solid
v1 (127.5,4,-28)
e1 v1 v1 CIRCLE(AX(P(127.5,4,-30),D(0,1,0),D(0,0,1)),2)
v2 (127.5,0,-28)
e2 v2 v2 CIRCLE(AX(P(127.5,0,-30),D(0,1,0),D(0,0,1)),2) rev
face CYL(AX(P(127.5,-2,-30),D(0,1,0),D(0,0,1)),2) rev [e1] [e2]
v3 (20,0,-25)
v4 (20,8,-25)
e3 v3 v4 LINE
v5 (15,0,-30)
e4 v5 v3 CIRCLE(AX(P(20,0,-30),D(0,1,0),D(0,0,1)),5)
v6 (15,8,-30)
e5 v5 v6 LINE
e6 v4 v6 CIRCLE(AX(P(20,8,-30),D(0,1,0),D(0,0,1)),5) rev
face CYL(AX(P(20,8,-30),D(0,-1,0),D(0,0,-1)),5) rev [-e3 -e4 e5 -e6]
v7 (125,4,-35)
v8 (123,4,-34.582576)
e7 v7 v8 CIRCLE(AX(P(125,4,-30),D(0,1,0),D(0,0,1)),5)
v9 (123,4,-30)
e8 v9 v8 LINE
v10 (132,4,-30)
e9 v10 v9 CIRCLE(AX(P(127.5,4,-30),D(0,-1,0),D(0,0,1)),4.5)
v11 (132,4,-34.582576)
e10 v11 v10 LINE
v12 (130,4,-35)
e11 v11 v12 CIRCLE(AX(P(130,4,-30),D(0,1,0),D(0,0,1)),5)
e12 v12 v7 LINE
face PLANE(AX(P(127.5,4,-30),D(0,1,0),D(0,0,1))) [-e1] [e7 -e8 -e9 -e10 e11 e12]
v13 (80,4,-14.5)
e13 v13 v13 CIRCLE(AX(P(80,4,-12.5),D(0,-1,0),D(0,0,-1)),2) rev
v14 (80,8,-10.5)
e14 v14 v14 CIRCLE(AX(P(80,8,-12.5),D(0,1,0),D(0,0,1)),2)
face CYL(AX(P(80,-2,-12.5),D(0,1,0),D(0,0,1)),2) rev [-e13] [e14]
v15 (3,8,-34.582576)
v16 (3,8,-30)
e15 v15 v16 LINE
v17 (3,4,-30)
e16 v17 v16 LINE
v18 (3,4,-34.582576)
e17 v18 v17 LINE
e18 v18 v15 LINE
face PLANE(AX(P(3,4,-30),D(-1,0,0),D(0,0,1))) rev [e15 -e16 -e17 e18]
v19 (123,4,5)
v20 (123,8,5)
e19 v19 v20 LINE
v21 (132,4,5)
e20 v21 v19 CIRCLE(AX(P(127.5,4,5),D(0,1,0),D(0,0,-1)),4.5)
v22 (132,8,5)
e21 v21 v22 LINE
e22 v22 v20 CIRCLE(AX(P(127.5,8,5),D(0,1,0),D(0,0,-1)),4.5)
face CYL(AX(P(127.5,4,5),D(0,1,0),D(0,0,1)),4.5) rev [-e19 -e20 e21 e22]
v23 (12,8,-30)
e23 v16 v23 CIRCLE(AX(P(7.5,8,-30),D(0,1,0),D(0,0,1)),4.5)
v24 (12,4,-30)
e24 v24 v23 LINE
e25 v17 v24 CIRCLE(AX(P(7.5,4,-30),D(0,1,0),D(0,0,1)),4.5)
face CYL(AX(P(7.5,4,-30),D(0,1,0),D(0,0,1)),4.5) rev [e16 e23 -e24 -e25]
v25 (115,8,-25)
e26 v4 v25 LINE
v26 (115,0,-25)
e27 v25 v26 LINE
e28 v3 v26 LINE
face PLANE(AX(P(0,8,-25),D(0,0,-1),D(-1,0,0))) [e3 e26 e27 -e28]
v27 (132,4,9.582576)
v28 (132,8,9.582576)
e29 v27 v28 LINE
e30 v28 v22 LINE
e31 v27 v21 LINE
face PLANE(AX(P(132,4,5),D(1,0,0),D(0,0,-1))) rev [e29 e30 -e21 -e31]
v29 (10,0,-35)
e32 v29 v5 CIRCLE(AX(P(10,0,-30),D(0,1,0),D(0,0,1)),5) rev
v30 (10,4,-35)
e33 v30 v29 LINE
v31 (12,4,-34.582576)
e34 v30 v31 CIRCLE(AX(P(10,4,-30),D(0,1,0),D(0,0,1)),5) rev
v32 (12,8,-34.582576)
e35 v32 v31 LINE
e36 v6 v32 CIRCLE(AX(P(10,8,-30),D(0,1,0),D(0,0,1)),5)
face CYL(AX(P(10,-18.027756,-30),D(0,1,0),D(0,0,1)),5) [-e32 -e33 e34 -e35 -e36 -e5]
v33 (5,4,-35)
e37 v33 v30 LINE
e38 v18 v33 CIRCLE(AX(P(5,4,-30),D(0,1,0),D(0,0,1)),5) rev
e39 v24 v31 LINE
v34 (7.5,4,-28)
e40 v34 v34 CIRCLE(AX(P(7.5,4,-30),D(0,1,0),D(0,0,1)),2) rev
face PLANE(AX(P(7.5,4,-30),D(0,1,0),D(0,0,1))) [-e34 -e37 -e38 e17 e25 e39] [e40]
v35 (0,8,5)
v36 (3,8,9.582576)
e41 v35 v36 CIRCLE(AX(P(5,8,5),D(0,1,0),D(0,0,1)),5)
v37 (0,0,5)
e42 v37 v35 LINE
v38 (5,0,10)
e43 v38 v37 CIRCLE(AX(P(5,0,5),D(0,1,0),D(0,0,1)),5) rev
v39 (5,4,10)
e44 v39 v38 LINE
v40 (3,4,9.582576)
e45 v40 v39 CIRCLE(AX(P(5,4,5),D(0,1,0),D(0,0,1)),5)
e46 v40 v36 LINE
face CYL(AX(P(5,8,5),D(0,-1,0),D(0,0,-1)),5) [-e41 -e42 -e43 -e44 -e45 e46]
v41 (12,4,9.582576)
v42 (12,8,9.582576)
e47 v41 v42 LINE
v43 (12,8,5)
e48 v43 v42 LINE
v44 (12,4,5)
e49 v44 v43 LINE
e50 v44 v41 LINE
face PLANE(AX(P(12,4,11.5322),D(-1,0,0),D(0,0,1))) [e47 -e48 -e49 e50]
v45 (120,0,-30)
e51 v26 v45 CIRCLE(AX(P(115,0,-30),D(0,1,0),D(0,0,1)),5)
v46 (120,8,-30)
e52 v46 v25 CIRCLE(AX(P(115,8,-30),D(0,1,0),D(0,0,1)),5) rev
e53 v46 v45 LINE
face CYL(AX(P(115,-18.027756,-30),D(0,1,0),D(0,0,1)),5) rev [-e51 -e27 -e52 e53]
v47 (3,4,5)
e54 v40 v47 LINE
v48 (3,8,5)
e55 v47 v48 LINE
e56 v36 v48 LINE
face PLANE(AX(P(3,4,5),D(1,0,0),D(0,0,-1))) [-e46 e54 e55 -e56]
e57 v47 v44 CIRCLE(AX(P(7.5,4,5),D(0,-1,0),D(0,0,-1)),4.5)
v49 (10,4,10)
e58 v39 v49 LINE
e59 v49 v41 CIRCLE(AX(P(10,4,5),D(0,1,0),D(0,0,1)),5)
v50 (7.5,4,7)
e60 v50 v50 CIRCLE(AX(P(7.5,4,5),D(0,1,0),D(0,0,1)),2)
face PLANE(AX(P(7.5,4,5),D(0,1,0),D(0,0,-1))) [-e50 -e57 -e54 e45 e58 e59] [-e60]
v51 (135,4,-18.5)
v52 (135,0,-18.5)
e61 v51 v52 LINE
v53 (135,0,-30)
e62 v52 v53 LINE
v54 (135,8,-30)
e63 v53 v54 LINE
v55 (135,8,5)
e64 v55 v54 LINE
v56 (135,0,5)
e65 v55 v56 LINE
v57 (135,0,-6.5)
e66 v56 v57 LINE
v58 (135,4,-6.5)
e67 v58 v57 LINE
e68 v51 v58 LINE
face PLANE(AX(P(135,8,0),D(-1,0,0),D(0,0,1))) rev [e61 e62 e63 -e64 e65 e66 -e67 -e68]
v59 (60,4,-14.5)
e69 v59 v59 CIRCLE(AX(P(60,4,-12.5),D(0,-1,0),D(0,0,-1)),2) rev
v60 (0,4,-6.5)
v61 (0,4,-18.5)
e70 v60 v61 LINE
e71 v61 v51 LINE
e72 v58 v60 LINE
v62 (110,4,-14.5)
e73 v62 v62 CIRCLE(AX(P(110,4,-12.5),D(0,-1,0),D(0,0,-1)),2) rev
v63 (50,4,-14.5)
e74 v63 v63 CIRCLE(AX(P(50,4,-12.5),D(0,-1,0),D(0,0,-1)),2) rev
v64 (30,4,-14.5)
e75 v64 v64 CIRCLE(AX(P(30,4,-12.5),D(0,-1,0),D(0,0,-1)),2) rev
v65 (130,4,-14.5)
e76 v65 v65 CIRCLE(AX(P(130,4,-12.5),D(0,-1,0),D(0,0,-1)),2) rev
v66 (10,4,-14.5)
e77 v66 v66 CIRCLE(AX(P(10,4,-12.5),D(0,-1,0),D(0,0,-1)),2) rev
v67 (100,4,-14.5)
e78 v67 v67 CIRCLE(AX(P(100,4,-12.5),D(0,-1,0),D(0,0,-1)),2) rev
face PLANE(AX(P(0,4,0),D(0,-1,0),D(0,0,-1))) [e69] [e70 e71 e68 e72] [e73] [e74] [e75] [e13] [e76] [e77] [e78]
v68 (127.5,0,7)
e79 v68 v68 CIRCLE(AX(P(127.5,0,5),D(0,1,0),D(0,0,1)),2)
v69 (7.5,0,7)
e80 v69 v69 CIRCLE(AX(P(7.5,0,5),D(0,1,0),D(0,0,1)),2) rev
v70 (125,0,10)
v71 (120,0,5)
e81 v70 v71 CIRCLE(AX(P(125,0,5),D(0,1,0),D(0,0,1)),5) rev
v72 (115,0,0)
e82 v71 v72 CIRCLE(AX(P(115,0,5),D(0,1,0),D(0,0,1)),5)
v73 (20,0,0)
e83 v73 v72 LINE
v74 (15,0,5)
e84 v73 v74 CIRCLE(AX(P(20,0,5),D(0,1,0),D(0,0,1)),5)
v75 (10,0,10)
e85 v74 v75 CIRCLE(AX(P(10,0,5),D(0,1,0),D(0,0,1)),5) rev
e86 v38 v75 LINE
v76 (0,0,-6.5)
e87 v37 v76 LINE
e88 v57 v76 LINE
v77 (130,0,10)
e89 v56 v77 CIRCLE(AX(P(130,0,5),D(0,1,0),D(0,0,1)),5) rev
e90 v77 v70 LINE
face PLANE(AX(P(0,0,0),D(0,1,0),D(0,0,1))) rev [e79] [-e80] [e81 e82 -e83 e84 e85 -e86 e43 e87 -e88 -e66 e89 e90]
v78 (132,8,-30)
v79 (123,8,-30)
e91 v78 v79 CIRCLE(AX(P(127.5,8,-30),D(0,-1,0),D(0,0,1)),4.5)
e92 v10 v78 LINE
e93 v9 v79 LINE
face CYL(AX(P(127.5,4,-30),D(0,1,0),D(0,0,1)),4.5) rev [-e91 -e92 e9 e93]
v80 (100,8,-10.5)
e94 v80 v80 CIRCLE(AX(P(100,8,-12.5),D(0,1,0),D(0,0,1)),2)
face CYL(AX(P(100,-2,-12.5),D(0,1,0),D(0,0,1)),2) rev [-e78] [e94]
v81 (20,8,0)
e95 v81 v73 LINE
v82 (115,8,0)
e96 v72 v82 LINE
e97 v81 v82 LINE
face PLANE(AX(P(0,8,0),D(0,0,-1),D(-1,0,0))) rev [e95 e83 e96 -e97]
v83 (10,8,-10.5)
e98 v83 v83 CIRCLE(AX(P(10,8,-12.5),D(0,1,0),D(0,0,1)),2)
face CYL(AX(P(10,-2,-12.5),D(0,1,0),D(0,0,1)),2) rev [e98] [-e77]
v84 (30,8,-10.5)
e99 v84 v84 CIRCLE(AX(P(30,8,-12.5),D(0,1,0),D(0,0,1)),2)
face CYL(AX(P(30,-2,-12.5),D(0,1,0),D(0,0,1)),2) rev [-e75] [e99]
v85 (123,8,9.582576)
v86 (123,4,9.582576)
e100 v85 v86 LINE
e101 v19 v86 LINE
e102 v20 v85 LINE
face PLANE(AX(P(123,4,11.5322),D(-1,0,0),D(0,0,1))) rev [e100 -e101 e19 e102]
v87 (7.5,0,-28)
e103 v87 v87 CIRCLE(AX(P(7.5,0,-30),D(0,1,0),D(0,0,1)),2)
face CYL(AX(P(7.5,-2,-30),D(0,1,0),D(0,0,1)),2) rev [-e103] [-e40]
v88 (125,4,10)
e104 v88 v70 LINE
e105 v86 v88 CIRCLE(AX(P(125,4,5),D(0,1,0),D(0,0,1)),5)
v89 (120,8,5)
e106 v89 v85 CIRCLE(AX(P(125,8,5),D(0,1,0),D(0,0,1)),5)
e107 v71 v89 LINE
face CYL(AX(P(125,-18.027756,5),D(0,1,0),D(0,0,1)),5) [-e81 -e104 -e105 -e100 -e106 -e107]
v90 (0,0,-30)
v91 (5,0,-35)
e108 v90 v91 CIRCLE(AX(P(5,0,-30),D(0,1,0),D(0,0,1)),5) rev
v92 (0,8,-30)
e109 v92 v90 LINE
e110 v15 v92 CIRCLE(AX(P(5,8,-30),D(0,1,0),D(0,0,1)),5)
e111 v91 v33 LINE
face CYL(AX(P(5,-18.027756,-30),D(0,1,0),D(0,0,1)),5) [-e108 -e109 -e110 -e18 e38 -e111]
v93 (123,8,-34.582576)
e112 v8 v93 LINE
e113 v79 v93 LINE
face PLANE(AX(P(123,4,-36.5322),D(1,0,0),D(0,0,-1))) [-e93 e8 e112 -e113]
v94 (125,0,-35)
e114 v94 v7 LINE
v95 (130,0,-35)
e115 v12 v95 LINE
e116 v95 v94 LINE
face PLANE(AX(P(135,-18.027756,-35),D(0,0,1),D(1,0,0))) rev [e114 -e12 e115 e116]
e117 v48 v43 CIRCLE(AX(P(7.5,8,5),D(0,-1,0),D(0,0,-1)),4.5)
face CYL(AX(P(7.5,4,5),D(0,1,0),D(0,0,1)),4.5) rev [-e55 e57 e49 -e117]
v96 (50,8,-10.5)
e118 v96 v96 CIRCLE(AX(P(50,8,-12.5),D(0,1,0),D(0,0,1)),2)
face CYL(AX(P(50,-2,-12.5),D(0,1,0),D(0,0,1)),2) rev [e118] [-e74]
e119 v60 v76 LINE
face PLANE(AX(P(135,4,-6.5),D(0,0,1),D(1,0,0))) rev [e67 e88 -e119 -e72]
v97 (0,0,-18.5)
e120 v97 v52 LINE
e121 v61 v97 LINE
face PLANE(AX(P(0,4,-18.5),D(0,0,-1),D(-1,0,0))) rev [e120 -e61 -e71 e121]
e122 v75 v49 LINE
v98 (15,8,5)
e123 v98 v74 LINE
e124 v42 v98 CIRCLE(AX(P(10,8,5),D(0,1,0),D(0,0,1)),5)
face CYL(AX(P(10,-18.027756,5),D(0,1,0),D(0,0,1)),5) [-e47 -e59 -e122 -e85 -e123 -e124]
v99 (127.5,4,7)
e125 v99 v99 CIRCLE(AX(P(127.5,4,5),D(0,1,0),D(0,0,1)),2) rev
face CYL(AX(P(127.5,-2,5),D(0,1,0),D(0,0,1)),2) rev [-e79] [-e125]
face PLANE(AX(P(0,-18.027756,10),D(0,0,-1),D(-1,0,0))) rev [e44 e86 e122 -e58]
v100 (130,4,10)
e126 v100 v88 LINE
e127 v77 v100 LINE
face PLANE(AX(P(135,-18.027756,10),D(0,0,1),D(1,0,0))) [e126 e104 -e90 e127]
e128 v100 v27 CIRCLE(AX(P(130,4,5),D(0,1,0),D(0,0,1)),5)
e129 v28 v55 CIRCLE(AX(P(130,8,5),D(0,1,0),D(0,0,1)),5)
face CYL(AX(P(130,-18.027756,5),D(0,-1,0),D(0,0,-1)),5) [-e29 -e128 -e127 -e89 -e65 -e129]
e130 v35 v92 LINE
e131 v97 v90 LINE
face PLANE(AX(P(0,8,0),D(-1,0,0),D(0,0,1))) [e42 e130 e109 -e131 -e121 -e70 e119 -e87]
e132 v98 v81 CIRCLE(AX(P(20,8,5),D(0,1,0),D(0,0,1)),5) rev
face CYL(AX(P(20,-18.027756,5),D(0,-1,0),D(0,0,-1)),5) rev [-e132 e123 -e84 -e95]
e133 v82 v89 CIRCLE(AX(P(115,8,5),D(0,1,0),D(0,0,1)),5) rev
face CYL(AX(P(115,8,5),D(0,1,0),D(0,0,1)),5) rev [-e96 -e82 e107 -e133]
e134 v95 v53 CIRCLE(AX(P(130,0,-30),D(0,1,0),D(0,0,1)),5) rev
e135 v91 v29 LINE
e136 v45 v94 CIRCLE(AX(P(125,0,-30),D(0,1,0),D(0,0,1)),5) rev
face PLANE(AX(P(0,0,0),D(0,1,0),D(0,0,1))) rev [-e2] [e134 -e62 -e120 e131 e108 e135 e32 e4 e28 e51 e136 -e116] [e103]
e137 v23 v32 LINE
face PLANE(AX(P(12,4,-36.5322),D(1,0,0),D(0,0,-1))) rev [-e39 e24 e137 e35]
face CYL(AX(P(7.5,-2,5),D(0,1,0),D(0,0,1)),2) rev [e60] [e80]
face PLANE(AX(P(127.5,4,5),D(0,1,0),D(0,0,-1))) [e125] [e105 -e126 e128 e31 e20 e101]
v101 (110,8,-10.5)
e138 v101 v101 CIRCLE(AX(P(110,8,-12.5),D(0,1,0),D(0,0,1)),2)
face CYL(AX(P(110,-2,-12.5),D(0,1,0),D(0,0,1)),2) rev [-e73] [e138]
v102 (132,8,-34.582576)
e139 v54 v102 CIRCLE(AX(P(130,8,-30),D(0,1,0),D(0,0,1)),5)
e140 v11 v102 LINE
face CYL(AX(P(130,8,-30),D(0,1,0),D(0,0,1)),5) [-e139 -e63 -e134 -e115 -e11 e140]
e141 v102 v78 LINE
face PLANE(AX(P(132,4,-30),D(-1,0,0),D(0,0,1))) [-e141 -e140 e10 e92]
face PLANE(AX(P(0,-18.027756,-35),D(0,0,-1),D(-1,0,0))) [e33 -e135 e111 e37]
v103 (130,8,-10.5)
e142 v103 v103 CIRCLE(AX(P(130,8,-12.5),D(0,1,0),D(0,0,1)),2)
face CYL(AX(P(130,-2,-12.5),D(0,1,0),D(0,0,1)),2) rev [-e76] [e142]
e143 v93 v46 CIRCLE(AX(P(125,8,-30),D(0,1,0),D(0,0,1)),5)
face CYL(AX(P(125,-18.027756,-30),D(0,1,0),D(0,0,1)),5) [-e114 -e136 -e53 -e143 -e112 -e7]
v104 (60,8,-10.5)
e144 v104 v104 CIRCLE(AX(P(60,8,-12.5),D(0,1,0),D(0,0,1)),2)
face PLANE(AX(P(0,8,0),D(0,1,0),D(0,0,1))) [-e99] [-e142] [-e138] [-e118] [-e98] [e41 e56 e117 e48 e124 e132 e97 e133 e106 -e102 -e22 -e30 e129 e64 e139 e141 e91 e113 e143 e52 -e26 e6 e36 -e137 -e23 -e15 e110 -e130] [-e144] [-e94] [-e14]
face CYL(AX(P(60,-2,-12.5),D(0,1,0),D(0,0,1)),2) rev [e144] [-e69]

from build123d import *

# Parameters (mm, degrees)
SKETCH1_W                                  = 135
SKETCH1_H                                  = 25
BOSS_EXTRUDE1_DEPTH                        = 8
SKETCH2_W                                  = 15
SKETCH2_H                                  = 10
BOSS_EXTRUDE2_DEPTH                        = 8
FILLET1_R                                  = 5
SKETCH3_R                                  = 2
CUT_EXTRUDE1_DEPTH                         = 10
CUT_EXTRUDE2_DEPTH                         = 4
MIRROR3_AT_THE_SECOND_PLANE_COPY_1_SKETC_W = 15
MIRROR3_AT_THE_SECOND_PLANE_COPY_1_SKETC_H = 10
MIRROR3_AT_THE_SECOND_PLANE_COPY_1_DEPTH   = 8
MIRROR3_AT_THE_SECOND_PLANE_COPY_2_SKETC_R = 2
MIRROR3_AT_THE_SECOND_PLANE_COPY_2_DEPTH   = 10
MIRROR3_AT_THE_SECOND_PLANE_COPY_3_DEPTH   = 4
FILLET2_R                                  = 5
SKETCH5_R                                  = 2
CUT_EXTRUDE3_DEPTH                         = 10
SKETCH6_W                                  = 135
SKETCH6_H                                  = 12
CUT_EXTRUDE4_DEPTH                         = 4


with BuildPart() as part:
    # Sketch1 → Boss-Extrude1 (new body)
    with BuildSketch(Plane(origin=(0, 0, 0), x_dir=(1, 0, 0), z_dir=(0, 1, 0))):
        with Locations((67.5, 12.5)):
            Rectangle(SKETCH1_W, SKETCH1_H)
    extrude(amount=BOSS_EXTRUDE1_DEPTH)

    # Sketch2 → Boss-Extrude2 (add)
    with BuildSketch(Plane(origin=(0, 8, 0), x_dir=(1, 0, 0), z_dir=(0, 1, 0))):
        with Locations((7.5, 30)):
            Rectangle(SKETCH2_W, SKETCH2_H)
    boss_extrude2 = extrude(amount=-BOSS_EXTRUDE2_DEPTH)

    # Fillet1
    fillet1_edges = [part.edges().sort_by_distance(p)[0] for p in [
        (0, 4, -35),
        (15, 4, -35),
    ]]
    fillet(fillet1_edges, radius=FILLET1_R)

    # Sketch3 → Cut-Extrude1 (cut)
    with BuildSketch(Plane(origin=(0, 8, 0), x_dir=(1, 0, 0), z_dir=(0, 1, 0))):
        with Locations(Location((7.5, 30, 0), (0, 0, 270))):
            Circle(SKETCH3_R)
    cut_extrude1 = extrude(amount=-CUT_EXTRUDE1_DEPTH, mode=Mode.SUBTRACT)

    # Sketch4 → Cut-Extrude2 (cut)
    with BuildSketch(Plane(origin=(0, 8, 0), x_dir=(1, 0, 0), z_dir=(0, 1, 0))):
        with BuildLine():
            Line((3, 30), (3, 34.582575695))
            Line((3, 34.582575695), (3.751281218, 37.139462948))
            Line((3.751281218, 37.139462948), (12, 36.532200332))
            Line((12, 36.532200332), (12, 30))
            ThreePointArc((12, 30), (7.5, 25.5), (3, 30))
        make_face()
    cut_extrude2 = extrude(amount=-CUT_EXTRUDE2_DEPTH, mode=Mode.SUBTRACT)

    # Mirror3: Boss-Extrude2, Cut-Extrude1, Cut-Extrude2 across plane
    add(boss_extrude2.mirror(Plane.XY.offset(-12.5)))
    add(cut_extrude1.mirror(Plane.XY.offset(-12.5)), mode=Mode.SUBTRACT)
    add(cut_extrude2.mirror(Plane.XY.offset(-12.5)), mode=Mode.SUBTRACT)

    # Mirror3 at the second plane: Boss-Extrude2, Cut-Extrude1, Cut-Extrude2 across plane
    add(boss_extrude2.mirror(Plane.ZY.offset(-67.5)))
    add(cut_extrude1.mirror(Plane.ZY.offset(-67.5)), mode=Mode.SUBTRACT)
    add(cut_extrude2.mirror(Plane.ZY.offset(-67.5)), mode=Mode.SUBTRACT)

    # Mirror3 at the second plane copy 1 sketc → Mirror3 at the second plane copy 1 (add)
    with BuildSketch(Plane(origin=(135, 8, -25), x_dir=(-1, 0, 0), z_dir=(0, 1, 0))):
        with Locations((7.5, 30)):
            Rectangle(MIRROR3_AT_THE_SECOND_PLANE_COPY_1_SKETC_W, MIRROR3_AT_THE_SECOND_PLANE_COPY_1_SKETC_H)
    extrude(amount=-MIRROR3_AT_THE_SECOND_PLANE_COPY_1_DEPTH)

    # Mirror3 at the second plane copy 2 sketc → Mirror3 at the second plane copy 2 (cut)
    with BuildSketch(Plane(origin=(135, 8, -25), x_dir=(-1, 0, 0), z_dir=(0, 1, 0))):
        with Locations(Location((7.5, 30, 0), (0, 0, 270))):
            Circle(MIRROR3_AT_THE_SECOND_PLANE_COPY_2_SKETC_R)
    extrude(amount=-MIRROR3_AT_THE_SECOND_PLANE_COPY_2_DEPTH, mode=Mode.SUBTRACT)

    # Mirror3 at the second plane copy 3 sketc → Mirror3 at the second plane copy 3 (cut)
    with BuildSketch(Plane(origin=(135, 8, -25), x_dir=(-1, 0, 0), z_dir=(0, 1, 0))):
        with BuildLine():
            Line((3, 30), (3, 34.582575695))
            Line((3, 34.582575695), (3.751281218, 37.139462948))
            Line((3.751281218, 37.139462948), (12, 36.532200332))
            Line((12, 36.532200332), (12, 30))
            ThreePointArc((12, 30), (7.5, 25.5), (3, 30))
        make_face()
    extrude(amount=-MIRROR3_AT_THE_SECOND_PLANE_COPY_3_DEPTH, mode=Mode.SUBTRACT)

    # Fillet2
    fillet2_edges = [part.edges().sort_by_distance(p)[0] for p in [
        (15, 4, -25),
        (120, 4, -35),
        (120, 4, -25),
        (135, 4, -35),
        (15, 4, 10),
        (15, 4, 0),
        (0, 4, 10),
        (135, 4, 10),
        (120, 4, 10),
        (120, 4, 0),
    ]]
    fillet(fillet2_edges, radius=FILLET2_R - 0.0001)  # a hair under: the kernel refuses the full size

    # Sketch5 → Cut-Extrude3 (cut)
    with BuildSketch(Plane(origin=(0, 8, 0), x_dir=(1, 0, 0), z_dir=(0, 1, 0))):
        with Locations(Location((10, 12.5, 0), (0, 0, 270))):
            Circle(SKETCH5_R)
        with Locations(Location((30, 12.5, 0), (0, 0, 270))):
            Circle(SKETCH5_R)
        with Locations(Location((50, 12.5, 0), (0, 0, 270))):
            Circle(SKETCH5_R)
        with Locations(Location((60, 12.5, 0), (0, 0, 270))):
            Circle(SKETCH5_R)
        with Locations(Location((80, 12.5, 0), (0, 0, 270))):
            Circle(SKETCH5_R)
        with Locations(Location((100, 12.5, 0), (0, 0, 270))):
            Circle(SKETCH5_R)
        with Locations(Location((110, 12.5, 0), (0, 0, 270))):
            Circle(SKETCH5_R)
        with Locations(Location((130, 12.5, 0), (0, 0, 270))):
            Circle(SKETCH5_R)
    extrude(amount=-CUT_EXTRUDE3_DEPTH, mode=Mode.SUBTRACT)

    # Sketch6 → Cut-Extrude4 (cut)
    with BuildSketch(Plane.XZ):
        with Locations((67.5, -12.5)):
            Rectangle(SKETCH6_W, SKETCH6_H)
    extrude(amount=-CUT_EXTRUDE4_DEPTH, mode=Mode.SUBTRACT)


solid = part.part
